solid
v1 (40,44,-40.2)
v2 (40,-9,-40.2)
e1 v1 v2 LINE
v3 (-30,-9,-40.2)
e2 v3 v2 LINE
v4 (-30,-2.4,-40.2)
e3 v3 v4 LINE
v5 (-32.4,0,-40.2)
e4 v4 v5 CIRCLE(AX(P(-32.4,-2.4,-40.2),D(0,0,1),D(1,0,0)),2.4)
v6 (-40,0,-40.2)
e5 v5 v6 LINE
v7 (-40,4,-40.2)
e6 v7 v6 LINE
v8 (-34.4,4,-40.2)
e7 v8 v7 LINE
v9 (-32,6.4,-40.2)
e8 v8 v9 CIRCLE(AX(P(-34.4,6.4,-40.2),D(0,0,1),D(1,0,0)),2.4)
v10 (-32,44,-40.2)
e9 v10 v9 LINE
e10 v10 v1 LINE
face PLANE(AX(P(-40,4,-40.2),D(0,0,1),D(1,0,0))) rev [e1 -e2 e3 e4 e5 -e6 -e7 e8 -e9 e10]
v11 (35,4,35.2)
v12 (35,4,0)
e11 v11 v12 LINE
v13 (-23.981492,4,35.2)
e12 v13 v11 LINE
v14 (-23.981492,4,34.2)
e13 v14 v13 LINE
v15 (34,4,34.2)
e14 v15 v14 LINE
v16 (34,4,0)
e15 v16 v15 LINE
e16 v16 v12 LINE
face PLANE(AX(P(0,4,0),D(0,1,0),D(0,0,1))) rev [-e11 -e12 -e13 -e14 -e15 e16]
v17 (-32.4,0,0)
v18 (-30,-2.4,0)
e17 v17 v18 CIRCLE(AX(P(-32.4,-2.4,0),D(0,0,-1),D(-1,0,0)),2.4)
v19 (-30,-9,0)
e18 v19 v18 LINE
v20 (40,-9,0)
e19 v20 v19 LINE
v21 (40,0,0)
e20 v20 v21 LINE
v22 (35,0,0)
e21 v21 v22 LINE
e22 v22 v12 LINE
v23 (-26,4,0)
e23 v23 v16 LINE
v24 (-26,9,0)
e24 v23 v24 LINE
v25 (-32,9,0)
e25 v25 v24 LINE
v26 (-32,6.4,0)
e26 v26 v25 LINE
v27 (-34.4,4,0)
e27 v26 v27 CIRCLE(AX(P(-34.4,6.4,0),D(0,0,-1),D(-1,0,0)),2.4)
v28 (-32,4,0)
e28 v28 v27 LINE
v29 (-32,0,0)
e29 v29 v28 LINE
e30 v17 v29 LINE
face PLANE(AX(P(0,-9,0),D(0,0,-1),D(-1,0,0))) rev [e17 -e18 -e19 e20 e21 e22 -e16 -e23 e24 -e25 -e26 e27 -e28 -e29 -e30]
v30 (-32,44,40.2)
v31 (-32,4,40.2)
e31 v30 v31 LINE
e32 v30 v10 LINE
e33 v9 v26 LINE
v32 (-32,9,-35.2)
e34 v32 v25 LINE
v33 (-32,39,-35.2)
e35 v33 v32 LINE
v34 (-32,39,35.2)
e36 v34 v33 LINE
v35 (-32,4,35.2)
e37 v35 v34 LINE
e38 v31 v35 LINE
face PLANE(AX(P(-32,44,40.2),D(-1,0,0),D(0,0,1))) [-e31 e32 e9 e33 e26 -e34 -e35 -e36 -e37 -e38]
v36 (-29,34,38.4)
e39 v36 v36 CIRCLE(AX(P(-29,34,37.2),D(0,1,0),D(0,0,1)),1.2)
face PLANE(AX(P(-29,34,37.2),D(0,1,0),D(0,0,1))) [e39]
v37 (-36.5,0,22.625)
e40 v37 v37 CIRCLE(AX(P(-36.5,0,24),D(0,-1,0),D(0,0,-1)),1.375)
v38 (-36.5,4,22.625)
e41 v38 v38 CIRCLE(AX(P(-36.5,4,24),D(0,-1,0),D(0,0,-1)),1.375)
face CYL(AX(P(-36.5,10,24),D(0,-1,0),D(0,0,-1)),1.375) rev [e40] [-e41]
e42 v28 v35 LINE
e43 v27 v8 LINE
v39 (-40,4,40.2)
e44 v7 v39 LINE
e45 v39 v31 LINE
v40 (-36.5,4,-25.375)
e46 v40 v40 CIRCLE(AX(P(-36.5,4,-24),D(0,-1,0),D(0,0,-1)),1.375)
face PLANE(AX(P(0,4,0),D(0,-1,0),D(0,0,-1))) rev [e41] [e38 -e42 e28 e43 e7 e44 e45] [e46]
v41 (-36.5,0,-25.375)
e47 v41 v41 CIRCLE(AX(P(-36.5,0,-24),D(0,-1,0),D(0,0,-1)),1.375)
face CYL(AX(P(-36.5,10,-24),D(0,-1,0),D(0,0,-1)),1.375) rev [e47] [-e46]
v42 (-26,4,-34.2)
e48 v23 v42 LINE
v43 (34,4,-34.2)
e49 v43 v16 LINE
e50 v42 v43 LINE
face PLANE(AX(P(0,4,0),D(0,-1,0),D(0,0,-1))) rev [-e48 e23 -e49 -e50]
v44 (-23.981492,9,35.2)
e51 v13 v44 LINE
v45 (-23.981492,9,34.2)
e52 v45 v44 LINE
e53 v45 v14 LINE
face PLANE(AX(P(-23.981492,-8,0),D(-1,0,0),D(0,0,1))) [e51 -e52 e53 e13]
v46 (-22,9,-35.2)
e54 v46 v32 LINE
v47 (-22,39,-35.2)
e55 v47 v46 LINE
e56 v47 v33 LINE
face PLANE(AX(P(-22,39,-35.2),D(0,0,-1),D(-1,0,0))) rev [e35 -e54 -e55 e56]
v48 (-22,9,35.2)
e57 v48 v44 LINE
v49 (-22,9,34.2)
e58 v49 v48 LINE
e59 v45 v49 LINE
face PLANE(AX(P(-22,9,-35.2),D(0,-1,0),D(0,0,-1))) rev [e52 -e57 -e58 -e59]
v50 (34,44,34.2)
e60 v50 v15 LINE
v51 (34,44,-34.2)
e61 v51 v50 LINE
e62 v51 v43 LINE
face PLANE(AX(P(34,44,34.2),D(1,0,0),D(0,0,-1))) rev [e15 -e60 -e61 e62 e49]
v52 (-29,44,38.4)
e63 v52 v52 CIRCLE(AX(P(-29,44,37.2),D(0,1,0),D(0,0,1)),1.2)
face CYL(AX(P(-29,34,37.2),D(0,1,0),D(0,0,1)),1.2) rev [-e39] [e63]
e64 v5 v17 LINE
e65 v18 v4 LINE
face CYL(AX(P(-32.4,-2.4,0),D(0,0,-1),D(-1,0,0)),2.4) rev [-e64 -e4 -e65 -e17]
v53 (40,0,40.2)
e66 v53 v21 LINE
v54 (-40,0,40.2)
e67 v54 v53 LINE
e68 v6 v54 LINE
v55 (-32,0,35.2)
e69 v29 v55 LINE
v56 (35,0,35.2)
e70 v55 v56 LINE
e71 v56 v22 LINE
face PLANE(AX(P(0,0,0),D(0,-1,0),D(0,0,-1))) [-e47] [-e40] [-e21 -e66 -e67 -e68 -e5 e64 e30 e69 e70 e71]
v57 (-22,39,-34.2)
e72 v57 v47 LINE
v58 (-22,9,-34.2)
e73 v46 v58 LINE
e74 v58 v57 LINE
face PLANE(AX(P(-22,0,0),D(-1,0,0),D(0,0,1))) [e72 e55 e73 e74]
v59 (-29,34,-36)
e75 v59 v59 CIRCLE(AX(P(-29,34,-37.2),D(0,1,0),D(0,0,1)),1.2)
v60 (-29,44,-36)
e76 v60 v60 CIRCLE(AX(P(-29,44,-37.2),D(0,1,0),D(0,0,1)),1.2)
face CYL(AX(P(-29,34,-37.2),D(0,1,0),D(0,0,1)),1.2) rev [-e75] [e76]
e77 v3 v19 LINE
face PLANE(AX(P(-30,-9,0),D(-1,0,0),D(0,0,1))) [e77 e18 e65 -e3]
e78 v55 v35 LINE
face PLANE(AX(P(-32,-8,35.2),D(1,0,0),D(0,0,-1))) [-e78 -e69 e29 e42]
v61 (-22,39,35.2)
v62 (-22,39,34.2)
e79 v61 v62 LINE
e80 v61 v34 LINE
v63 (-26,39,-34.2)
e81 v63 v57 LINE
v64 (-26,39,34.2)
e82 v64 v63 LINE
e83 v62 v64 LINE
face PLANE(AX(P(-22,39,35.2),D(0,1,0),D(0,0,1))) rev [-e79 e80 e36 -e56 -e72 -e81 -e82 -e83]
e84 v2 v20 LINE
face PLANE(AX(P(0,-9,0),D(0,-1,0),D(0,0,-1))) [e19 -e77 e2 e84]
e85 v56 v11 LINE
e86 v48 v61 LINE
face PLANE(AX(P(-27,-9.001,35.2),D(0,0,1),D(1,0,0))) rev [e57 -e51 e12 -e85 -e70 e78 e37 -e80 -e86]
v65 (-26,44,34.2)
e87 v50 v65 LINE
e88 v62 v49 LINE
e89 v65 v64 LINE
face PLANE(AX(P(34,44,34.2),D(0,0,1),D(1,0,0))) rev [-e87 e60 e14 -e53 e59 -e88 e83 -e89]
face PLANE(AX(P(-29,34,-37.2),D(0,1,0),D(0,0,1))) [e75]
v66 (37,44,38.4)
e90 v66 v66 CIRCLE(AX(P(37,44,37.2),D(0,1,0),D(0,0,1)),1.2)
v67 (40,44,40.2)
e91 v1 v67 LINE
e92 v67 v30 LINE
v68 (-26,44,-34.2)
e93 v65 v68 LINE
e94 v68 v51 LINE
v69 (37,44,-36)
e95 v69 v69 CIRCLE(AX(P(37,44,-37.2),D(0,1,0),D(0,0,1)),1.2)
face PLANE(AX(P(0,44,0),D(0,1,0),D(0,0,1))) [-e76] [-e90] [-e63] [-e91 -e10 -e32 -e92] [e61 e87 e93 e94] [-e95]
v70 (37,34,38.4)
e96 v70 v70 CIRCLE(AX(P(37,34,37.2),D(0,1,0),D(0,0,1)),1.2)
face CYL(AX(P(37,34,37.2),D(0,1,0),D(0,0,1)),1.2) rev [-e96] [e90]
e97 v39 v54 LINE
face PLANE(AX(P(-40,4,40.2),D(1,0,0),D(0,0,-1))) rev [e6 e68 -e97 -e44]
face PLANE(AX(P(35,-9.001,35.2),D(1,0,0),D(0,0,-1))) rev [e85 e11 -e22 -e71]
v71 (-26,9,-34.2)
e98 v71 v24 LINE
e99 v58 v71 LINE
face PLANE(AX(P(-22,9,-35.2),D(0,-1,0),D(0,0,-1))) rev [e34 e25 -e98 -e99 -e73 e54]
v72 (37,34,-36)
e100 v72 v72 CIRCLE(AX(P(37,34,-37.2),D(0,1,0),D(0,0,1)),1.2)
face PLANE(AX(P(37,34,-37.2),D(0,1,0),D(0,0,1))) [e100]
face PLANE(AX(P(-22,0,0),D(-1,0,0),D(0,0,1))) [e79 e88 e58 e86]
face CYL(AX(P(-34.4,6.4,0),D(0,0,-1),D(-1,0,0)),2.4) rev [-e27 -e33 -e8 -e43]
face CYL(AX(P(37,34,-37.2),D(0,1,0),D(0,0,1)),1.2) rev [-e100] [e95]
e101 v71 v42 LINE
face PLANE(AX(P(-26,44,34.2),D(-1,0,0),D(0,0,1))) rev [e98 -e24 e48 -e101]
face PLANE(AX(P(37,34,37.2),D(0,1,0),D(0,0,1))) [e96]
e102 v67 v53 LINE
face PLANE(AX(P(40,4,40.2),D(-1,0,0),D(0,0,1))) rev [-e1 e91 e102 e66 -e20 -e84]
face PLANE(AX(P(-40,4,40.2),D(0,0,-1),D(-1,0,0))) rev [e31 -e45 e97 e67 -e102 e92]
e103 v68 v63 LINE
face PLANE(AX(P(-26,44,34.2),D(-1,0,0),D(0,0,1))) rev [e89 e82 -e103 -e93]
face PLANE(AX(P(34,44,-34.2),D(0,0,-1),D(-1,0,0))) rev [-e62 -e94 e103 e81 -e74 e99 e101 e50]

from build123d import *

# Parameters (mm, degrees)
SKETCH1_W           = 80
SKETCH1_H           = 80.4
BOSS_EXTRUDE1_DEPTH = 4
SKETCH3_W           = 70
SKETCH3_H           = 40.2
BOSS_EXTRUDE3_DEPTH = 9
SKETCH4_R           = 1.375
CUT_EXTRUDE1_DEPTH  = 19
CUT_EXTRUDE4_REACH  = 60.181
SKETCH6_W           = 62
SKETCH6_H           = 35.2
SKETCH7_W           = 72
SKETCH7_H           = 80.4
SKETCH7_W_2         = 60
SKETCH7_H_2         = 68.4
BOSS_EXTRUDE4_DEPTH = 40
SKETCH9_R           = 1.2
CUT_EXTRUDE5_DEPTH  = 10
SKETCH10_W          = 70.4
SKETCH10_H          = 30
CUT_EXTRUDE6_DEPTH  = 10
CUT_EXTRUDE7_DEPTH  = 17
FILLET1_R           = 2.4


with BuildPart() as part:
    # Sketch1 → Boss-Extrude1 (new body)
    with BuildSketch(Plane(origin=(0, 0, 0), x_dir=(1, 0, 0), z_dir=(0, 1, 0))):
        Rectangle(SKETCH1_W, SKETCH1_H)
    extrude(amount=BOSS_EXTRUDE1_DEPTH)

    # Sketch3 → Boss-Extrude3 (add)
    with BuildSketch(Plane.XZ):
        with Locations((5, -20.1)):
            Rectangle(SKETCH3_W, SKETCH3_H)
    extrude(amount=BOSS_EXTRUDE3_DEPTH)

    # Sketch4 → Cut-Extrude1 (cut)
    with BuildSketch(Plane.XZ.offset(9)):
        with Locations(Location((-36.5, 24, 0), (0, 0, 270))):
            Circle(SKETCH4_R)
        with Locations(Location((-36.5, -24, 0), (0, 0, 270))):
            Circle(SKETCH4_R)
    extrude(amount=-CUT_EXTRUDE1_DEPTH, mode=Mode.SUBTRACT)

    # Sketch6 → Cut-Extrude4 (cut, up to next)
    with BuildSketch(Plane(origin=(0, 4, 0), x_dir=(1, 0, 0), z_dir=(0, 1, 0)), mode=Mode.PRIVATE) as cut_extrude4_sk1:
        with Locations((4, -17.6)):
            Rectangle(SKETCH6_W, SKETCH6_H)
    cut_extrude4_tool1 = extrude(cut_extrude4_sk1.sketch, amount=-CUT_EXTRUDE4_REACH, mode=Mode.PRIVATE) & part.part
    add(cut_extrude4_tool1.solids().sort_by_distance((4, 4, 17.6))[0], mode=Mode.SUBTRACT)

    # Sketch7 → Boss-Extrude4 (add)
    with BuildSketch(Plane.XZ.offset(-4)):
        with Locations((4, 0)):
            Rectangle(SKETCH7_W, SKETCH7_H)
        with Locations((4, 0)):
            Rectangle(SKETCH7_W_2, SKETCH7_H_2, mode=Mode.SUBTRACT)
    extrude(amount=-BOSS_EXTRUDE4_DEPTH)

    # Sketch9 → Cut-Extrude5 (cut)
    with BuildSketch(Plane(origin=(0, 44, 0), x_dir=(1, 0, 0), z_dir=(0, 1, 0))):
        with Locations(Location((-29, 37.2, 0), (0, 0, 270))):
            Circle(SKETCH9_R)
        with Locations(Location((37, 37.2, 0), (0, 0, 270))):
            Circle(SKETCH9_R)
        with Locations(Location((37, -37.2, 0), (0, 0, 270))):
            Circle(SKETCH9_R)
        with Locations(Location((-29, -37.2, 0), (0, 0, 270))):
            Circle(SKETCH9_R)
    extrude(amount=-CUT_EXTRUDE5_DEPTH, mode=Mode.SUBTRACT)

    # Sketch10 → Cut-Extrude6 (cut)
    with BuildSketch(Plane.ZY.offset(32)):
        with Locations((0, 24)):
            Rectangle(SKETCH10_W, SKETCH10_H)
    extrude(amount=-CUT_EXTRUDE6_DEPTH, mode=Mode.SUBTRACT)

    # Sketch11 → Cut-Extrude7 (cut)
    with BuildSketch(Plane(origin=(0, 9, 0), x_dir=(1, 0, 0), z_dir=(0, 1, 0))):
        Polygon((-32, 0), (-32, -35.2), (-23.981492028, -35.2), (-23.981492028, -34.2), (-26, -34.2), (-26, 0), align=None)
    extrude(amount=-CUT_EXTRUDE7_DEPTH, mode=Mode.SUBTRACT)

    # Fillet1
    # the kernel refuses this fillet: 2.4 mm, written as the material it adds along each edge
    with BuildSketch(Plane(origin=(-32, 4, 0), x_dir=(0, 1, 0), z_dir=(0, 0, -1)), Plane(origin=(-30, 0, 0), x_dir=(-1, 0, 0), z_dir=(0, 0, -1))) as fillet1_piece_1:
        with BuildLine():
            CenterArc((FILLET1_R, -FILLET1_R), FILLET1_R, 90, 90)
            Line((0, -FILLET1_R), (0, 0))
            Line((0, 0), (FILLET1_R, 0))
        make_face()
    extrude(amount=40.2)


solid = part.part
